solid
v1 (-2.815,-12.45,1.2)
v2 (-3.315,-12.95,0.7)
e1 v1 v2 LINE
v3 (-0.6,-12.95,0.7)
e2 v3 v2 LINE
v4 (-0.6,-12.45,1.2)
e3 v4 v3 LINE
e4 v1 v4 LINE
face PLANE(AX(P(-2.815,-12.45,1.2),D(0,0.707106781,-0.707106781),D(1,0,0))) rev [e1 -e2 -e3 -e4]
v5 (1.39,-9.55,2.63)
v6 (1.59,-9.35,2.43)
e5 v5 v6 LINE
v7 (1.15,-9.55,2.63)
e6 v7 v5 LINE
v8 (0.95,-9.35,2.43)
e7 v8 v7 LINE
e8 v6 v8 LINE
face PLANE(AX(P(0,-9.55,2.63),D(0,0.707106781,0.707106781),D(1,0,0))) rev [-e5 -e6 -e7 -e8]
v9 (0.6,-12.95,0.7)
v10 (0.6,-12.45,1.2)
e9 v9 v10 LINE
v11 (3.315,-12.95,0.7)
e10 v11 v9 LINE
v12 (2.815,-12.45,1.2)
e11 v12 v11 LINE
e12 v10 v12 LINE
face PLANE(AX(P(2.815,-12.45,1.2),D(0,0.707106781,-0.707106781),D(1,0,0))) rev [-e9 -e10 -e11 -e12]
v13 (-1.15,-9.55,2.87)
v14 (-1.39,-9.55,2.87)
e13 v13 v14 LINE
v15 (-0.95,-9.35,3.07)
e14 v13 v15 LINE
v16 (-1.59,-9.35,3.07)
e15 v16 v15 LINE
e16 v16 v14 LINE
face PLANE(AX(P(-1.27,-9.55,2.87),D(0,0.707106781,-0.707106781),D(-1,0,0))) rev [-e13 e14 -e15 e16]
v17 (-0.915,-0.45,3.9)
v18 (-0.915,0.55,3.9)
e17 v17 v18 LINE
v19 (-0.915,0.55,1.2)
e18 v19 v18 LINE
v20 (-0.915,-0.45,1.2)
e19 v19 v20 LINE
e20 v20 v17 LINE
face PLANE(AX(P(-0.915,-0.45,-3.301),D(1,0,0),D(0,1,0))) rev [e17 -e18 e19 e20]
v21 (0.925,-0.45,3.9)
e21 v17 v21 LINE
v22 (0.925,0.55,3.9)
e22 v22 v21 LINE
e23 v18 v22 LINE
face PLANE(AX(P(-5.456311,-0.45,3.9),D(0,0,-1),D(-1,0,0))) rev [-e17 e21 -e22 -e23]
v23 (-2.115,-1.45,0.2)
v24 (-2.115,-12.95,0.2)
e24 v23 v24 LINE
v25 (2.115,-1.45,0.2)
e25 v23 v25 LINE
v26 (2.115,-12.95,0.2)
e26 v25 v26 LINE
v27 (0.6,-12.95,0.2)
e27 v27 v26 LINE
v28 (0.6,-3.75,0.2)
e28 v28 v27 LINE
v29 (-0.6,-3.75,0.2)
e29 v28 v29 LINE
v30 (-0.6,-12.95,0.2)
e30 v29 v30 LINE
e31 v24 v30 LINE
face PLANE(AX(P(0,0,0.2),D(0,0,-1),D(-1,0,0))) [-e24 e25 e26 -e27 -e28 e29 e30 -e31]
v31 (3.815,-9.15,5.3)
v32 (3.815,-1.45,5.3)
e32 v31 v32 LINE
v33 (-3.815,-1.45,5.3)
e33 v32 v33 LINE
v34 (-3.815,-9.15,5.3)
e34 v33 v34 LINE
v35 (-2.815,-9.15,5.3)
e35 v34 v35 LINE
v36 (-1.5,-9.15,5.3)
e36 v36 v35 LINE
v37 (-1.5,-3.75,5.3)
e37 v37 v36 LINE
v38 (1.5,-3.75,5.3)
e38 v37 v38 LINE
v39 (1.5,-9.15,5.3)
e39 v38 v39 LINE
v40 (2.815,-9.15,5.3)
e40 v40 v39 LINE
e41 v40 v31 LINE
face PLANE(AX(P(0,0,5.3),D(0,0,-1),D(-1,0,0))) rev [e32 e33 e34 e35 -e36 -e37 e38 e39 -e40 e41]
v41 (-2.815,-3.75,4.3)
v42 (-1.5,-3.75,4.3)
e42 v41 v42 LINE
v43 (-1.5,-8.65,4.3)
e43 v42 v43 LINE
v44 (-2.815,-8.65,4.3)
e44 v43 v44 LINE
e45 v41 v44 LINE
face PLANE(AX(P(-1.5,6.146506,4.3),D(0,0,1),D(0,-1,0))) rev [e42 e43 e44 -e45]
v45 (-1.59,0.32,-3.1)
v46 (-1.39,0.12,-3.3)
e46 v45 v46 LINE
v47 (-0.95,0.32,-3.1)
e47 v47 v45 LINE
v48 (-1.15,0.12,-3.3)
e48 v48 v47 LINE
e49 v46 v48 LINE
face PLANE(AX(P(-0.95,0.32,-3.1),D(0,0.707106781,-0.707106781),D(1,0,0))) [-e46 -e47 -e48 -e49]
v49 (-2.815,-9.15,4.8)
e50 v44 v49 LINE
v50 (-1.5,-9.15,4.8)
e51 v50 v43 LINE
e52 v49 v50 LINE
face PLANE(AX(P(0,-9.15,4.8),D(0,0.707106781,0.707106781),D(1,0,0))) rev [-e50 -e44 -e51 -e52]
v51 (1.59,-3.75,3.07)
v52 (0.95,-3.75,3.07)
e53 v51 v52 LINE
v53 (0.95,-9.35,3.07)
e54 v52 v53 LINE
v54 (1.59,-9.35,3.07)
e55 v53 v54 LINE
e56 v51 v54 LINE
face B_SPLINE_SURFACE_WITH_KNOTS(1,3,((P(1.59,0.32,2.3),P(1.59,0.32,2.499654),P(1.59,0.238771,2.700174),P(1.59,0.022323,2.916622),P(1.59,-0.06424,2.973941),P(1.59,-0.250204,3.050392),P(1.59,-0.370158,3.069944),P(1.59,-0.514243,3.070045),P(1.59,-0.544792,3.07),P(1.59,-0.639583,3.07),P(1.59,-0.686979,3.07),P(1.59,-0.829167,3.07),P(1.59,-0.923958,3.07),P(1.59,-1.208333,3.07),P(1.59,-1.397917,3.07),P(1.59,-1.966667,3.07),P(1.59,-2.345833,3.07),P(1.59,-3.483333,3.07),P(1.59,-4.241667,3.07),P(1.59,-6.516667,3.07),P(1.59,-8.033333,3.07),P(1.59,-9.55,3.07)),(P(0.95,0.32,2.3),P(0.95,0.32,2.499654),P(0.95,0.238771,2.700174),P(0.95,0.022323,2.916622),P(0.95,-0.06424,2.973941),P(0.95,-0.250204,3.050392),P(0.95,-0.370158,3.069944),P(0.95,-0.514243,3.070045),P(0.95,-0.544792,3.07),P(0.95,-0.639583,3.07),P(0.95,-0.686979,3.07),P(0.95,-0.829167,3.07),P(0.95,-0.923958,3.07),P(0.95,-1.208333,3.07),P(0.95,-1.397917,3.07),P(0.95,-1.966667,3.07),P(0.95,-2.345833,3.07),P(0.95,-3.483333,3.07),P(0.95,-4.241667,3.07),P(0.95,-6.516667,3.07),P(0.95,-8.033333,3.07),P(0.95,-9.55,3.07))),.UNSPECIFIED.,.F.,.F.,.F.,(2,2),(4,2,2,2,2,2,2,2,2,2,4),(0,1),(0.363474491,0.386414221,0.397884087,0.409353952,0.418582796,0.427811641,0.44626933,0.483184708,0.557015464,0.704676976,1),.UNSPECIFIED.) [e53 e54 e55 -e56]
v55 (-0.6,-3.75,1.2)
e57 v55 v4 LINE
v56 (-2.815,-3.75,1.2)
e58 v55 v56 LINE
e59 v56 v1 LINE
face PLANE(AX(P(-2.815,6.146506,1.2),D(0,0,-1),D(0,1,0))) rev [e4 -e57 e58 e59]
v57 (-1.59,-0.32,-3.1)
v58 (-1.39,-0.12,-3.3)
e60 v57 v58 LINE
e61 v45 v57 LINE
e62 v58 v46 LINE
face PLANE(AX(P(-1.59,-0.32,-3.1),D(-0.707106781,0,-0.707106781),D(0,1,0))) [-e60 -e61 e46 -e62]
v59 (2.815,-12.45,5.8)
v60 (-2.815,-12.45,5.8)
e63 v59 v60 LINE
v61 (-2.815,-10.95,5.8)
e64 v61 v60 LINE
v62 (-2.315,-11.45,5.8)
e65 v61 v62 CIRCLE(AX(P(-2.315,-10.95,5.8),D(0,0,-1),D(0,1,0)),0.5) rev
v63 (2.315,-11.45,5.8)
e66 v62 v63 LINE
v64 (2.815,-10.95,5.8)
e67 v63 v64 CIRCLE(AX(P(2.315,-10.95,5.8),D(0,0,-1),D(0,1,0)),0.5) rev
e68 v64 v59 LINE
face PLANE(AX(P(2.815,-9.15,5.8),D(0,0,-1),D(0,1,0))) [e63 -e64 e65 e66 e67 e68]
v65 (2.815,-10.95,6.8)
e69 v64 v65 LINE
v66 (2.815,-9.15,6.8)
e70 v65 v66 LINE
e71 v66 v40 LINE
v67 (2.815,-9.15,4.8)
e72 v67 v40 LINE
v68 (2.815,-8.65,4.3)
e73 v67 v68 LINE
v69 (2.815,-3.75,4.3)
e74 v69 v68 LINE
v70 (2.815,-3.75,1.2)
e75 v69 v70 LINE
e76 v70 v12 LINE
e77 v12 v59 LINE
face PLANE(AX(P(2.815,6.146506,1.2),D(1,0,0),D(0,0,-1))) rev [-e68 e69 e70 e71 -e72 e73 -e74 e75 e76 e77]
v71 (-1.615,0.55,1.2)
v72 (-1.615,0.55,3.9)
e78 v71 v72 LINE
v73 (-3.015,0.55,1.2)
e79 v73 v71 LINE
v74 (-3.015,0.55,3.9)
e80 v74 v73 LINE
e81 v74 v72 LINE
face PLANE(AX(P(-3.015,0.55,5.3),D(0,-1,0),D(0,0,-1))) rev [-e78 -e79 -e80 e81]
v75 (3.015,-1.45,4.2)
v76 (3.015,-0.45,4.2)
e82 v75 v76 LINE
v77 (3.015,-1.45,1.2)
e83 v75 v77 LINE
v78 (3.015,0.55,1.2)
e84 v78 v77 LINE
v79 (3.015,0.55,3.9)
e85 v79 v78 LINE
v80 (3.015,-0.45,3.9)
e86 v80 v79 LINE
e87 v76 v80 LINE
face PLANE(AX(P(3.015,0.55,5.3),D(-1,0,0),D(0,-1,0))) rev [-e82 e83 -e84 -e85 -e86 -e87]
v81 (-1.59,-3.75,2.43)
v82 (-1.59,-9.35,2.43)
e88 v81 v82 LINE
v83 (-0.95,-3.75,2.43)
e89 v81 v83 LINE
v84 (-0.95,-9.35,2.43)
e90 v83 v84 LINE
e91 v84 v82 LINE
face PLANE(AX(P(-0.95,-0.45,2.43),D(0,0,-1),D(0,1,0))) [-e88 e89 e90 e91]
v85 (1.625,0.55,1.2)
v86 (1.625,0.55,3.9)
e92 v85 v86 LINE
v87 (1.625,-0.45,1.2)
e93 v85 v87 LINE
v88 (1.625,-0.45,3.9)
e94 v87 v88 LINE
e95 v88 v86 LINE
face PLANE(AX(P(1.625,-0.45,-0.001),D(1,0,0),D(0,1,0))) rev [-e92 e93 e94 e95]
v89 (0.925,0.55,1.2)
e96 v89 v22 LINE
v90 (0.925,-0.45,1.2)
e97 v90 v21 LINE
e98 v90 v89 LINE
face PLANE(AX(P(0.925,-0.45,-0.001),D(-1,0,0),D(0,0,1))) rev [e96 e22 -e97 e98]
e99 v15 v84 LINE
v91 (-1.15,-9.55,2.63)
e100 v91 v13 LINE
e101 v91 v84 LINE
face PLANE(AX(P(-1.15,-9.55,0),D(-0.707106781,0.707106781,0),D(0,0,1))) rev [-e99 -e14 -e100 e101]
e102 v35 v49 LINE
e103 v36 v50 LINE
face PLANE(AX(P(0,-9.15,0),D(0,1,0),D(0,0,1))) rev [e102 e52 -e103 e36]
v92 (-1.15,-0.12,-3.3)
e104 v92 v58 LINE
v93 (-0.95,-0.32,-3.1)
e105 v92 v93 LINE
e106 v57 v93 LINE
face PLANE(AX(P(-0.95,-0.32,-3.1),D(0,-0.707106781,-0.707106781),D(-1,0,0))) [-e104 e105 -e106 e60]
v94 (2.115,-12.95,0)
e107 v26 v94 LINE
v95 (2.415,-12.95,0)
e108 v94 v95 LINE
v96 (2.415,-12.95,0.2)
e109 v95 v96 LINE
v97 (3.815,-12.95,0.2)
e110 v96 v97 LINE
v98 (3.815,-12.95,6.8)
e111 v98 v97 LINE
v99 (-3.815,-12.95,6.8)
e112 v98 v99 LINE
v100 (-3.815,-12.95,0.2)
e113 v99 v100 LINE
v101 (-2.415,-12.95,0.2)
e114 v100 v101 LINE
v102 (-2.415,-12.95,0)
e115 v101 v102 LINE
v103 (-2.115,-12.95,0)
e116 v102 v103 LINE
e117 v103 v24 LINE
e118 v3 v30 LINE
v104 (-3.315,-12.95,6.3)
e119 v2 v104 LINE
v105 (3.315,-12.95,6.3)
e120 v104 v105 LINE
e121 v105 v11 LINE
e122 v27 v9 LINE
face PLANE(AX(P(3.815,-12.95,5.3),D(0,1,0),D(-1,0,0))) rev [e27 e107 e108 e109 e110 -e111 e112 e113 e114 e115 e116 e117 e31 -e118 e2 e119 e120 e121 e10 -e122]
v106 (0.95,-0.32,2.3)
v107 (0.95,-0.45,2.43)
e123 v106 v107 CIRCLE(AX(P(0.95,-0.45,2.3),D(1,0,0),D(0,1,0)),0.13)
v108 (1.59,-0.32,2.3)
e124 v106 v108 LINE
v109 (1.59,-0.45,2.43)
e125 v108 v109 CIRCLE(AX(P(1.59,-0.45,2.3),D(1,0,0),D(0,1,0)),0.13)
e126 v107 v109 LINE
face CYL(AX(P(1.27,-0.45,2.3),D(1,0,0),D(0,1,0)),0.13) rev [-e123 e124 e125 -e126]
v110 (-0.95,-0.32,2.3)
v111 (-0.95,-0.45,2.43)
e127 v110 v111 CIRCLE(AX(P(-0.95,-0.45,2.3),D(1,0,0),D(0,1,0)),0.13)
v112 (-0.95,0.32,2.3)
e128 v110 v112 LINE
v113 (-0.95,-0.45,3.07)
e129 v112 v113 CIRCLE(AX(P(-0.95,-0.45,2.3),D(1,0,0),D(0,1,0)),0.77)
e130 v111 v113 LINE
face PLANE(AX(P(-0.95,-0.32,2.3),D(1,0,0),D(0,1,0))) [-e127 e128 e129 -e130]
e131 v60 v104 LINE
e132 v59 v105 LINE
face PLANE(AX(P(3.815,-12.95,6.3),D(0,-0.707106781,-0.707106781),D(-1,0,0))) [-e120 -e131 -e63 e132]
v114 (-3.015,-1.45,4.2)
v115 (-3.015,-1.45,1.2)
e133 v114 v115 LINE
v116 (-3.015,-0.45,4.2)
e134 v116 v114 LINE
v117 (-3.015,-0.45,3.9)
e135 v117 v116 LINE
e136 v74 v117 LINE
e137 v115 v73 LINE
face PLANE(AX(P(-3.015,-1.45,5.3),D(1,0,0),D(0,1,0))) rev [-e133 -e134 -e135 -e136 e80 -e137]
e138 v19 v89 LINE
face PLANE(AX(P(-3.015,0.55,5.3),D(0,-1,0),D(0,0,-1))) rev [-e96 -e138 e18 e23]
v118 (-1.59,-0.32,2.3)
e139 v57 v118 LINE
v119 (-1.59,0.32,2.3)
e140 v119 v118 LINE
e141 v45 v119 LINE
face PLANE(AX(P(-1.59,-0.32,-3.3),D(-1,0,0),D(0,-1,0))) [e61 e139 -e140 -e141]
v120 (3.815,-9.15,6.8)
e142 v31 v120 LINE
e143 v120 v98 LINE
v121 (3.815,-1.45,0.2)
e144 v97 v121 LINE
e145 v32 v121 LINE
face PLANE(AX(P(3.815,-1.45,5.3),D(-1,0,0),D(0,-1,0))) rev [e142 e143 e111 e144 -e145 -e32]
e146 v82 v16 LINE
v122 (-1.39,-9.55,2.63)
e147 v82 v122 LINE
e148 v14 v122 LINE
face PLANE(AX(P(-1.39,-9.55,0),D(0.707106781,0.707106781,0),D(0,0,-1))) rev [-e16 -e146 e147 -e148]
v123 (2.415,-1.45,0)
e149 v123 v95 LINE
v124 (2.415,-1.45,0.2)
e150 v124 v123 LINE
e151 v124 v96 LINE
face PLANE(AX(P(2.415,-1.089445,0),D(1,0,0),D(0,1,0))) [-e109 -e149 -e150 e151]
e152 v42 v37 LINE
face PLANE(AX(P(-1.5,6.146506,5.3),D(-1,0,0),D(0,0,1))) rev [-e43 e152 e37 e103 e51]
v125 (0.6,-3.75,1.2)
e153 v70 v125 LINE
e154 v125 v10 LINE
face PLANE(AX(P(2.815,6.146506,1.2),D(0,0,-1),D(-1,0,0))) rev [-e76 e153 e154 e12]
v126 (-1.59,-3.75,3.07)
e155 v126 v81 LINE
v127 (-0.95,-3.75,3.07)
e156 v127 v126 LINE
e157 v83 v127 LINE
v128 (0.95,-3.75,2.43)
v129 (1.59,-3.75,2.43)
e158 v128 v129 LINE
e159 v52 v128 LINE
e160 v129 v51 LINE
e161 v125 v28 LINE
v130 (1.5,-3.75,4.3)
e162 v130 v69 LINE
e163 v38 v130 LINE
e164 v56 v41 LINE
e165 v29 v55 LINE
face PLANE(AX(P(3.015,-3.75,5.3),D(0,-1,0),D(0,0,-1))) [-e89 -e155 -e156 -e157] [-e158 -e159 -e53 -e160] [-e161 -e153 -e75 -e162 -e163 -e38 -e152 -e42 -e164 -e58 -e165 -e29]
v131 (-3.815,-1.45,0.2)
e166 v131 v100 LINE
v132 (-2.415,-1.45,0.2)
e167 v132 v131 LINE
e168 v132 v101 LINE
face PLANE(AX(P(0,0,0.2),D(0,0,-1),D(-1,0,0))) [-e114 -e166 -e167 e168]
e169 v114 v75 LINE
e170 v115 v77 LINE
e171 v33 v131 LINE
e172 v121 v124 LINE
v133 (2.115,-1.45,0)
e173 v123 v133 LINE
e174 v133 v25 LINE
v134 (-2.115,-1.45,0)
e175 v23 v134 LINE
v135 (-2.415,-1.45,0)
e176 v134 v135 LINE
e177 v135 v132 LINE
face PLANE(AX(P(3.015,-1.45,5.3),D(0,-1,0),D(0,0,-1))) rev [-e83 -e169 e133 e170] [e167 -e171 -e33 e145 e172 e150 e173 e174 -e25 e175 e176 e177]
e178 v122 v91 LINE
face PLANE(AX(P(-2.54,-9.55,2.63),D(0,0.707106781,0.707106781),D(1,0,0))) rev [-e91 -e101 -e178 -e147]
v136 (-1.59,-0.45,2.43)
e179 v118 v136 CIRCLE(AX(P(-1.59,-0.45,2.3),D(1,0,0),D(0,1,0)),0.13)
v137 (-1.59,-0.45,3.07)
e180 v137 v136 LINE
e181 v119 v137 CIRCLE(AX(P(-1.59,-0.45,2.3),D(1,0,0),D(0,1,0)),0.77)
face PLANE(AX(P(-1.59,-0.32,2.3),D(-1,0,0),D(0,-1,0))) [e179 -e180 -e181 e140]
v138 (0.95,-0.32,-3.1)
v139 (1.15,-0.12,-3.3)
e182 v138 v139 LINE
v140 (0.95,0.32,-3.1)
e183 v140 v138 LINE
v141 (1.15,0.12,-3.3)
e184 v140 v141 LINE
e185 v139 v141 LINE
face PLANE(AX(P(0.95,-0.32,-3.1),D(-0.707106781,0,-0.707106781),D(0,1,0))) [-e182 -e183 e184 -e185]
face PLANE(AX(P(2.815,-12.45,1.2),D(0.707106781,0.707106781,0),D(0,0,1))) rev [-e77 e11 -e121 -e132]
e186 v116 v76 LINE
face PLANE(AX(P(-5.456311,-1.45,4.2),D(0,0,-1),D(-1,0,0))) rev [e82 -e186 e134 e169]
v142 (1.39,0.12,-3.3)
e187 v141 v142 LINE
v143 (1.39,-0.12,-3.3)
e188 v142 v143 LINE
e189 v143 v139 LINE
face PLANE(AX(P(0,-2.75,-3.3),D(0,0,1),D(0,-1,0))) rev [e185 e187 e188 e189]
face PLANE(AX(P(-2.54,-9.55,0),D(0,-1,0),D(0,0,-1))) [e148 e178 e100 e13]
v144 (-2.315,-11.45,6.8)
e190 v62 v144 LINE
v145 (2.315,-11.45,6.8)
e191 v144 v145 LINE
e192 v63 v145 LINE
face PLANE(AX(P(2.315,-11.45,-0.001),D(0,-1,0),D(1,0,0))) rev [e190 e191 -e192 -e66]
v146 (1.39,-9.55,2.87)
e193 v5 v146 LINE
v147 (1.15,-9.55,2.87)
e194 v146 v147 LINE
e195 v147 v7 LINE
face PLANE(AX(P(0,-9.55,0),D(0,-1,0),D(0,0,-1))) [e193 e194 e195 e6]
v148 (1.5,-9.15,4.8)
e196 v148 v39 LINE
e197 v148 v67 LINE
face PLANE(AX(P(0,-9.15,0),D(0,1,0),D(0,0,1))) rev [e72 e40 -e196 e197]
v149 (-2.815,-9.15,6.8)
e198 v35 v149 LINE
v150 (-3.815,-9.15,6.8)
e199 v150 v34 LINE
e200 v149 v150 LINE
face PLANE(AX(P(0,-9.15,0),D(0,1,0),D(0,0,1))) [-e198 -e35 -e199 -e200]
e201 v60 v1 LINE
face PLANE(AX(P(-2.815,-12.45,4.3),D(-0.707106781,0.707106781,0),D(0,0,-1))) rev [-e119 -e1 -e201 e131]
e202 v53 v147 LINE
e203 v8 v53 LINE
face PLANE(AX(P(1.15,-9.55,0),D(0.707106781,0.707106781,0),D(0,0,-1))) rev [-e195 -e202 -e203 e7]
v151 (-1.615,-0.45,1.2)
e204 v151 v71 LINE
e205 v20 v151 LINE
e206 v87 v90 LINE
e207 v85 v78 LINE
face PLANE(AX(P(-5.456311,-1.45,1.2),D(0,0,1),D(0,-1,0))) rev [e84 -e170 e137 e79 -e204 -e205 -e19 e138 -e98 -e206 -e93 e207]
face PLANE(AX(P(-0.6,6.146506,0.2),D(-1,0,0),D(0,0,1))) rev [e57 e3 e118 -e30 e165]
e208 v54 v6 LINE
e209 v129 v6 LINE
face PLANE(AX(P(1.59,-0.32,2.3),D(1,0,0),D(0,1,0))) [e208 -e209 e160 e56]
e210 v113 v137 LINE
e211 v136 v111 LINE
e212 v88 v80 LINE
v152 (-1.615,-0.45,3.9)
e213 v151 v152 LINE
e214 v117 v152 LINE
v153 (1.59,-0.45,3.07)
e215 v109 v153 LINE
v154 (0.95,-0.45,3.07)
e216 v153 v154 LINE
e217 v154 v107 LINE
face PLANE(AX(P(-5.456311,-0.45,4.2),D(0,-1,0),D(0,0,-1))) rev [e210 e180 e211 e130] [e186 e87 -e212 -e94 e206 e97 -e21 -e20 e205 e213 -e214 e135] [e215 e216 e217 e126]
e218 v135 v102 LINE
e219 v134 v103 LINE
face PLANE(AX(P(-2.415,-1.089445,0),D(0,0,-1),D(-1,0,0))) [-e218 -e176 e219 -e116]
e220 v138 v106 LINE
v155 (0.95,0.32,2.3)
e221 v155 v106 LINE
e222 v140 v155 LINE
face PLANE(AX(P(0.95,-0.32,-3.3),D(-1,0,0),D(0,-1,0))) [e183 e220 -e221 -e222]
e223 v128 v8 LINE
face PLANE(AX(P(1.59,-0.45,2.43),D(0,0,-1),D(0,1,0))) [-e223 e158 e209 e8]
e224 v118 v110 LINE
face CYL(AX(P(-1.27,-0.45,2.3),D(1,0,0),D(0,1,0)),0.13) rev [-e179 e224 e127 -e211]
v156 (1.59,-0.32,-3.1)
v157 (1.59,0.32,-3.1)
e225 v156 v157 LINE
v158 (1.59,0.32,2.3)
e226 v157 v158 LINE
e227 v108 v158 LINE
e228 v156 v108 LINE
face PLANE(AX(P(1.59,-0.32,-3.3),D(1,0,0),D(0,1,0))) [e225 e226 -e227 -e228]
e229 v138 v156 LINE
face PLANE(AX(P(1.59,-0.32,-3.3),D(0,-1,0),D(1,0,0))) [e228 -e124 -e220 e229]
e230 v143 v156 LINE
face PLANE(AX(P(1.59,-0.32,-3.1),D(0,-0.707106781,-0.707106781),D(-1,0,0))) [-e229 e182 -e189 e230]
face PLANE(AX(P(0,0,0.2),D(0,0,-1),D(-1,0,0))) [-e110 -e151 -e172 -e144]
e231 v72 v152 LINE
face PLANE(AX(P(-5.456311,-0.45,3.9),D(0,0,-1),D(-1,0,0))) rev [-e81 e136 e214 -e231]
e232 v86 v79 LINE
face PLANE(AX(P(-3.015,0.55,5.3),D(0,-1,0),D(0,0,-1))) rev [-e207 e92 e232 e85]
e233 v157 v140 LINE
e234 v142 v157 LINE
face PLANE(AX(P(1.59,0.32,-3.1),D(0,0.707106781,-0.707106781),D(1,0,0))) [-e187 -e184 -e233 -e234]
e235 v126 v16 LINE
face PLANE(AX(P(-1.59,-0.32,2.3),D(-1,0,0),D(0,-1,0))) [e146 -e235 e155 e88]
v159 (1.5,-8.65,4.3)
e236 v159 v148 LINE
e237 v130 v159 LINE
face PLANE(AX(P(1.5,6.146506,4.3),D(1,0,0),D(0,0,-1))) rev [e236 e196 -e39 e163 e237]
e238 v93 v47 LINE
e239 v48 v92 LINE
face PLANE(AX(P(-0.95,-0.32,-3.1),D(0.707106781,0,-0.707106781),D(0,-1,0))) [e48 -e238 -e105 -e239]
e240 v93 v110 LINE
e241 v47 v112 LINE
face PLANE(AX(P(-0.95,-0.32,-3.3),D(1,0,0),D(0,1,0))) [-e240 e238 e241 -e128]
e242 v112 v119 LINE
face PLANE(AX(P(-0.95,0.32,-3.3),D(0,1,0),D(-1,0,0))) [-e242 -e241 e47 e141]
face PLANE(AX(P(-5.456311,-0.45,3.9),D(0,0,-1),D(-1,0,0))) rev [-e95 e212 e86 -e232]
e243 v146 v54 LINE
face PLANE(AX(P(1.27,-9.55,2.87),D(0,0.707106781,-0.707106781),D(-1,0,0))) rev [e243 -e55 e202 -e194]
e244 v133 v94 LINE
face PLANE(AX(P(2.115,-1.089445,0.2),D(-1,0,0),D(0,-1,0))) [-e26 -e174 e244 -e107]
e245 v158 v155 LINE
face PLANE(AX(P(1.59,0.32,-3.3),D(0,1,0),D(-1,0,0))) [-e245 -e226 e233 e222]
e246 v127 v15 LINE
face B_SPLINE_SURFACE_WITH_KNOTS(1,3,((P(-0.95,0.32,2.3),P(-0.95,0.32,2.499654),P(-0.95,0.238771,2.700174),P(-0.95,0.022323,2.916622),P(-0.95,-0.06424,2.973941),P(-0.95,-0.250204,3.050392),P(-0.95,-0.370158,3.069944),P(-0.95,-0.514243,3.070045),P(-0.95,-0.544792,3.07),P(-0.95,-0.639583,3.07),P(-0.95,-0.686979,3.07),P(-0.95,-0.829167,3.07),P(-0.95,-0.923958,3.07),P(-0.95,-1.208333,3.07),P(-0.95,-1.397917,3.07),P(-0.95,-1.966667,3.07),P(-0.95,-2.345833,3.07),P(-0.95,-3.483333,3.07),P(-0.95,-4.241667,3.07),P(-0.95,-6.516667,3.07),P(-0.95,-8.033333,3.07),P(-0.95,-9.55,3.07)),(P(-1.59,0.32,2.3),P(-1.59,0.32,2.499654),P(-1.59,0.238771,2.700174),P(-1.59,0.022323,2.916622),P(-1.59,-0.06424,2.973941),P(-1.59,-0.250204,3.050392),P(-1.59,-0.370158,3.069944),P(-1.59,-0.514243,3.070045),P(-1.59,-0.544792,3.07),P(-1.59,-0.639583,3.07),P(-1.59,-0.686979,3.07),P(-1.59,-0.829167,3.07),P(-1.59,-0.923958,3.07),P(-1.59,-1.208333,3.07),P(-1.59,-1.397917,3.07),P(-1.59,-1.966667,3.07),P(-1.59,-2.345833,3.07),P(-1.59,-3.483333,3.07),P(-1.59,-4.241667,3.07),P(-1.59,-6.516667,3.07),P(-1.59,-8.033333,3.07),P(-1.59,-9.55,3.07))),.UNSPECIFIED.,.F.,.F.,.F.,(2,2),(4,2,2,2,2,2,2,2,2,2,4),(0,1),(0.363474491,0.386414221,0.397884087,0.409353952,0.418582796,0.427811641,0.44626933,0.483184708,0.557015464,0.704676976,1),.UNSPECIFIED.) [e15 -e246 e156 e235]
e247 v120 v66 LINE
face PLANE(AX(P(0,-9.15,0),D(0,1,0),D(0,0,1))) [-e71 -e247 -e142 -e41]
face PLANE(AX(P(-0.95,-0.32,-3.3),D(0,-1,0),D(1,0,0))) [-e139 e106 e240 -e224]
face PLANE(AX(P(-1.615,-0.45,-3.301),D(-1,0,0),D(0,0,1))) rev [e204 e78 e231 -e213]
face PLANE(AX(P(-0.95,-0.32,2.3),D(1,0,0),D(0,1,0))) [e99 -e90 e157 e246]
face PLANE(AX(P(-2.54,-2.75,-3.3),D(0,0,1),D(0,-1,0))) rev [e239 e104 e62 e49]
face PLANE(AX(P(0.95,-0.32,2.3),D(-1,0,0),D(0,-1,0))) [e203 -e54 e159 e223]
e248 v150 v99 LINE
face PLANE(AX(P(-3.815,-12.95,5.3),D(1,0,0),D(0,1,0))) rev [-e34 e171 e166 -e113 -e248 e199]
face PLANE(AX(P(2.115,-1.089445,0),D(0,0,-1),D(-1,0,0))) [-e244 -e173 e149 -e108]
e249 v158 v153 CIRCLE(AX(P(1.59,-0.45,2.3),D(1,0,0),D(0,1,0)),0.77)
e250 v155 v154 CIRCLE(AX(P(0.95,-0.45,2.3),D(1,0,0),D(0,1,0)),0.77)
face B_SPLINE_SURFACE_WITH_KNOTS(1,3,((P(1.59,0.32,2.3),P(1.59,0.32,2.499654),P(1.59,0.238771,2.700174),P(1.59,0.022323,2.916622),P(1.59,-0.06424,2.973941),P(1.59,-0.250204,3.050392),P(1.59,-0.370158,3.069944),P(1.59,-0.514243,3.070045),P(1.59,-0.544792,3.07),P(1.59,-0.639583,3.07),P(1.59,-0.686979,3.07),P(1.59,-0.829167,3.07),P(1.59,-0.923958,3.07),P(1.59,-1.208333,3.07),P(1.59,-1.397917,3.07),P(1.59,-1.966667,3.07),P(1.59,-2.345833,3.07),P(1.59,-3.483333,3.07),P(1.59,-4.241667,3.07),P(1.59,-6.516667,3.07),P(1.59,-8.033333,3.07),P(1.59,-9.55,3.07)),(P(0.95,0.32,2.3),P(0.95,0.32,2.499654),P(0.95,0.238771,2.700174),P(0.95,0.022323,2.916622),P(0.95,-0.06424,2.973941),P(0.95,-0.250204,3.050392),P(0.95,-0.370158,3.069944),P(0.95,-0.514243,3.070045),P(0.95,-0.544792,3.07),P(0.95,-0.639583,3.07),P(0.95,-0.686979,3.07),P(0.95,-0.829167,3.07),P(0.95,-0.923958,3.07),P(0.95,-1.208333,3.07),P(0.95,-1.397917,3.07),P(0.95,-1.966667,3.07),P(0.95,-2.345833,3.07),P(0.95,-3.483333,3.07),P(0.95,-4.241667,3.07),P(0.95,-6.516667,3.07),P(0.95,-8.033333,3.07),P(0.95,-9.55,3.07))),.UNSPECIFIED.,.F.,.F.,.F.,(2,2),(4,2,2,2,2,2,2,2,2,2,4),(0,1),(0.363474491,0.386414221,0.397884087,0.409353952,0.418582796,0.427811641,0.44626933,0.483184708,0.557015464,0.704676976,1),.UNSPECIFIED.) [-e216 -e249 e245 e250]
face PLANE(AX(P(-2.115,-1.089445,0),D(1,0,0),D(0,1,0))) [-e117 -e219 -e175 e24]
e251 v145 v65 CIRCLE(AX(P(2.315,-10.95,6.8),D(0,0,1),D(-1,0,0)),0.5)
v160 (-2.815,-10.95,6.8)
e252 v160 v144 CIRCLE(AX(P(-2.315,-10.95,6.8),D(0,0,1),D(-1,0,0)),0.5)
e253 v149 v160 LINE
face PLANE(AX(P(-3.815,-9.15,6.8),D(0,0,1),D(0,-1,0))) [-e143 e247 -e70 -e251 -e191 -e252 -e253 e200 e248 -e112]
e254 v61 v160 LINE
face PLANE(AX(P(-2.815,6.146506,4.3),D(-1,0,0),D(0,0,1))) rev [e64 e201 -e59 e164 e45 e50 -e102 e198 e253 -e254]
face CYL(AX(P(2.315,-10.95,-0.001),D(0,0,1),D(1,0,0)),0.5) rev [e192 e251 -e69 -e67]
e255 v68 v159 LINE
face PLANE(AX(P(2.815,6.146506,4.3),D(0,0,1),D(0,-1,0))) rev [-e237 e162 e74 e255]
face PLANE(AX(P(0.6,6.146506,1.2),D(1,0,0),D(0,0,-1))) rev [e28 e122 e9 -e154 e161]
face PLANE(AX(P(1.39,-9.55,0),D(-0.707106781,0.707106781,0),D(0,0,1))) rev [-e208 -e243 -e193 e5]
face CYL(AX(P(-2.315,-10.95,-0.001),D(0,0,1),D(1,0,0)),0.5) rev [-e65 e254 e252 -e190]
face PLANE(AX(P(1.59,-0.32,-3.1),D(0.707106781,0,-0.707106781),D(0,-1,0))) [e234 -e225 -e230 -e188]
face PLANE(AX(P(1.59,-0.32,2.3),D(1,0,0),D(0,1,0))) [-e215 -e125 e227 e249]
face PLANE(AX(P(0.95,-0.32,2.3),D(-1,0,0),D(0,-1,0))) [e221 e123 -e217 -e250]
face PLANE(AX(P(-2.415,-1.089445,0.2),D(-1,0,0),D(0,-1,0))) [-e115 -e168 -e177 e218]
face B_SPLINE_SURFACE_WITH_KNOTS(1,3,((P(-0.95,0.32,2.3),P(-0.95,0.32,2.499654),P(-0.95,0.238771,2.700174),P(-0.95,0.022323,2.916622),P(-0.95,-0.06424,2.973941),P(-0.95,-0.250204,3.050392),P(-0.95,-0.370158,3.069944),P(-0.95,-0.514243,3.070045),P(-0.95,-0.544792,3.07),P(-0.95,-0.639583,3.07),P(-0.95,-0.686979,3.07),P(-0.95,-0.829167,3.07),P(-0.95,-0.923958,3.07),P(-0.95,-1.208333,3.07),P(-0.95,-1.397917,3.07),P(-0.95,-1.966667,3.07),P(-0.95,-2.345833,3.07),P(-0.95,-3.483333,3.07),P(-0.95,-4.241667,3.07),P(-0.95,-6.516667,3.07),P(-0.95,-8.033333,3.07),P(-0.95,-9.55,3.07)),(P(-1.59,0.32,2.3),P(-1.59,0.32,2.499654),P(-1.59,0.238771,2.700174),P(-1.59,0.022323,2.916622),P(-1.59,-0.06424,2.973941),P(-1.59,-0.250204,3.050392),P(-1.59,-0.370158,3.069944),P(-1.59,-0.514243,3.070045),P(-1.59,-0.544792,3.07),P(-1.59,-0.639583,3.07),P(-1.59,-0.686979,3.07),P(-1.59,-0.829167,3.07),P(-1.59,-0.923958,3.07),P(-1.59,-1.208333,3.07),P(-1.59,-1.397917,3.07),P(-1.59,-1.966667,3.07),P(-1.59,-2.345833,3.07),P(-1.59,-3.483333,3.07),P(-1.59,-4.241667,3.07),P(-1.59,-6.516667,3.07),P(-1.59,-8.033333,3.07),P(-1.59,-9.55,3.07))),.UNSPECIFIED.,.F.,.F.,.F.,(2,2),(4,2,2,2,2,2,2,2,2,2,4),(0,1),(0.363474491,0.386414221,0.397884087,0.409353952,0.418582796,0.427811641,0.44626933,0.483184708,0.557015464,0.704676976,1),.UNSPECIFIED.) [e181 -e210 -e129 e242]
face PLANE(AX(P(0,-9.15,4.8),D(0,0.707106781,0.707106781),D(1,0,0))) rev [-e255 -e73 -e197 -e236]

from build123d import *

# Parameters (mm, degrees)
EXTRUDE_START                      = 0.2
EXTRUDE_1_DEPTH                    = 5.1
SKETCH_7_W                         = 0.3
SKETCH_7_H                         = 0.2
EXTRUDE_4_DEPTH                    = 11.5
SKETCH_8_W                         = 1
SKETCH_8_H                         = 2
CUT_EXTRUDE_5_DEPTH                = 6.03
CUT_EXTRUDE_1_DEPTH                = 9.2
EXTRUDE_2_DEPTH                    = 3.8
SKETCH_4_W                         = 5.63
SKETCH_4_H                         = 1
CUT_EXTRUDE_2_DEPTH                = 3.8
CUT_EXTRUDE_3_REACH                = 17.116
CHAMFER_1_SIZE                     = 0.5
CUT_EXTRUDE_6_REACH                = 16.052
SKETCH_9_W                         = 0.7
SKETCH_9_H                         = 1
SWEEP_START                        = 0.95
SWEEP_1_DEPTH                      = 0.64
CHAMFER_2_SIZE                     = 0.2
PATTERN_LINEAR_2_COUNT             = 2
PATTERN_LINEAR_2_PITCH             = 2.54
PATTERN_LINEAR_1_COUNT             = 2
PATTERN_LINEAR_1_PITCH             = 2.54
CHAMFER_2_OF_PATTERN_LINEAR_1_SIZE = 0.2


# Read off the part's stored shape, not the designer's step: По траектории1
with BuildPart() as part:
    # Эскиз1 → Бобышка-Вытянуть1 (new body)
    with BuildSketch(Plane.XY.offset(EXTRUDE_START)):
        Polygon((-3.015, 0.55), (3.015, 0.55), (3.015, -1.45), (3.815, -1.45), (3.815, -12.95), (-3.815, -12.95), (-3.815, -1.45), (-3.015, -1.45), align=None)
    extrude(amount=EXTRUDE_1_DEPTH)

    # Эскиз7 → Бобышка-Вытянуть4 (add)
    with BuildSketch(Plane.XZ.offset(12.95)):
        with Locations((2.265, 0.1)):
            Rectangle(SKETCH_7_W, SKETCH_7_H)
        with Locations((-2.265, 0.1)):
            Rectangle(SKETCH_7_W, SKETCH_7_H)
    extrude(amount=-EXTRUDE_4_DEPTH)

    # Эскиз8 → Вырез-Вытянуть5 (cut)
    with BuildSketch(Plane(origin=(3.015, 0, 0), x_dir=(0, 0, -1), z_dir=(1, 0, 0))):
        with Locations((-0.7, -0.45)):
            Rectangle(SKETCH_8_W, SKETCH_8_H)
        Polygon((-4.2, -1.45), (-5.3, -1.45), (-5.3, 0.55), (-3.9, 0.55), (-3.9, -0.45), (-4.2, -0.45), align=None)
    extrude(amount=-CUT_EXTRUDE_5_DEPTH, mode=Mode.SUBTRACT)

    # Эскиз2 → Вырез-Вытянуть1 (cut)
    with BuildSketch(Plane.XZ.offset(12.95)):
        Polygon((-2.815, 4.3), (-2.815, 1.2), (-0.6, 1.2), (-0.6, 0.2), (0.6, 0.2), (0.6, 1.2), (2.815, 1.2), (2.815, 4.3), (1.5, 4.3), (1.5, 5.3), (-1.5, 5.3), (-1.5, 4.3), align=None)
    extrude(amount=-CUT_EXTRUDE_1_DEPTH, mode=Mode.SUBTRACT)

    # Эскиз3 → Бобышка-Вытянуть2 (add)
    with BuildSketch(Plane.XZ.offset(12.95)):
        Polygon((-3.815, 5.3), (-3.815, 6.8), (3.815, 6.8), (3.815, 5.3), (2.815, 5.3), (2.815, 5.8), (-2.815, 5.8), (-2.815, 5.3), align=None)
    extrude(amount=-EXTRUDE_2_DEPTH)

    # Эскиз4 → Вырез-Вытянуть2 (cut)
    with BuildSketch(Plane.XZ.offset(12.95)):
        with Locations((0, 4.8)):
            Rectangle(SKETCH_4_W, SKETCH_4_H)
    extrude(amount=-CUT_EXTRUDE_2_DEPTH, mode=Mode.SUBTRACT)

    # Эскиз5 → Вырез-Вытянуть3 (cut, up to next)
    with BuildSketch(Plane.XY.offset(6.8), mode=Mode.PRIVATE) as cut_extrude_3_sk1:
        with BuildLine():
            Line((2.815, -9.15), (2.815, -10.95))
            ThreePointArc((2.815, -10.95), (2.668553391, -11.303553391), (2.315, -11.45))
            Line((2.315, -11.45), (-2.315, -11.45))
            ThreePointArc((-2.315, -11.45), (-2.668553391, -11.303553391), (-2.815, -10.95))
            Line((-2.815, -10.95), (-2.815, -9.15))
            Line((-2.815, -9.15), (2.815, -9.15))
        make_face()
    cut_extrude_3_tool1 = extrude(cut_extrude_3_sk1.sketch, amount=-CUT_EXTRUDE_3_REACH, mode=Mode.PRIVATE) & part.part
    add(cut_extrude_3_tool1.solids().sort_by_distance((0, -10.291324, 6.8))[0], mode=Mode.SUBTRACT)

    # Фаска1
    chamfer_1_edges = [part.edges().sort_by_distance(p)[0] for p in [
        (0, -12.95, 5.8),
        (-2.1575, -9.15, 4.3),
        (2.1575, -9.15, 4.3),
        (-2.815, -12.95, 3.5),
        (-1.7075, -12.95, 1.2),
        (1.7075, -12.95, 1.2),
        (2.815, -12.95, 3.5),
    ]]
    chamfer(chamfer_1_edges, length=CHAMFER_1_SIZE)

    # Эскиз9 → Вырез-Вытянуть6 (cut, up to next)
    with BuildSketch(Plane.XY.offset(3.9), mode=Mode.PRIVATE) as cut_extrude_6_sk1:
        with Locations((1.275, 0.05)):
            Rectangle(SKETCH_9_W, SKETCH_9_H)
    cut_extrude_6_tool1 = extrude(cut_extrude_6_sk1.sketch, amount=-CUT_EXTRUDE_6_REACH, mode=Mode.PRIVATE) & part.part
    cut_extrude_6 = cut_extrude_6_tool1.solids().sort_by_distance((1.275, 0.05, 3.9))[0]
    add(cut_extrude_6, mode=Mode.SUBTRACT)

    # По траектории1 outline → По траектории1 (add)
    with BuildSketch(Plane.YZ.offset(SWEEP_START)):
        with BuildLine():
            Line((-3.75, 2.43), (-3.75, 3.07))
            add(Edge.make_bspline(
                [(-3.75, 3.07), (-4.166666667, 3.07), (-4.583333333, 3.07), (-6.516666667, 3.07), (-8.033333333, 3.07), (-9.55, 3.07)],
                knots=[0.623544277, 0.623544277, 0.623544277, 0.623544277, 0.704676976, 0.704676976, 1, 1, 1, 1], degree=3))
            Line((-9.55, 3.07), (-9.55, 2.43))
            Line((-9.55, 2.43), (-3.75, 2.43))
        make_face()
        with BuildLine():
            Line((0.32, -3.3), (0.32, 2.3))
            add(Edge.make_bspline(
                [(0.32, 2.3), (0.32, 2.499654349), (0.23877091, 2.700173533), (0.022322877, 2.916621566), (-0.064240468, 2.973940923), (-0.250203983, 3.050392149), (-0.370157621, 3.069944018), (-0.45, 3.07)],
                knots=[0.363474491, 0.363474491, 0.363474491, 0.363474491, 0.386414221, 0.386414221, 0.397884087, 0.397884087, 0.409353952, 0.409353952, 0.409353952, 0.409353952], degree=3))
            Line((-0.45, 3.07), (-0.45, 2.43))
            ThreePointArc((-0.45, 2.43), (-0.358076118, 2.391923882), (-0.32, 2.3))
            Line((-0.32, 2.3), (-0.32, -3.3))
            Line((-0.32, -3.3), (0.32, -3.3))
        make_face()
    sweep_1 = extrude(amount=SWEEP_1_DEPTH)

    # Фаска2
    chamfer_2_edges = [part.edges().sort_by_distance(p)[0] for p in [
        (1.27, -9.55, 3.07),
        (1.59, -9.55, 2.75),
        (1.27, -9.55, 2.43),
        (0.95, -9.55, 2.75),
        (1.27, -0.32, -3.3),
        (1.59, 0, -3.3),
        (1.27, 0.32, -3.3),
        (0.95, 0, -3.3),
    ]]
    chamfer(chamfer_2_edges, length=CHAMFER_2_SIZE)

    # Линейный массив2: Вырез-Вытянуть6 ×2
    with Locations(*[(-i * PATTERN_LINEAR_2_PITCH, 0, 0) for i in range(1, PATTERN_LINEAR_2_COUNT)]):
        add(cut_extrude_6, mode=Mode.SUBTRACT)

    # Линейный массив1: По траектории1 ×2
    with Locations(*[(-i * PATTERN_LINEAR_1_PITCH, 0, 0) for i in range(1, PATTERN_LINEAR_1_COUNT)]):
        add(sweep_1)

    # Фаска2 of Линейный массив1
    chamfer_2_of_pattern_linear_1_edges = [part.edges().sort_by_distance(p)[0] for p in [
        (-1.27, -9.55, 3.07),
        (-0.95, -9.55, 2.75),
        (-1.27, -9.55, 2.43),
        (-1.59, -9.55, 2.75),
        (-1.27, -0.32, -3.3),
        (-0.95, 0, -3.3),
        (-1.27, 0.32, -3.3),
        (-1.59, 0, -3.3),
    ]]
    chamfer(chamfer_2_of_pattern_linear_1_edges, length=CHAMFER_2_OF_PATTERN_LINEAR_1_SIZE)


solid = part.part
